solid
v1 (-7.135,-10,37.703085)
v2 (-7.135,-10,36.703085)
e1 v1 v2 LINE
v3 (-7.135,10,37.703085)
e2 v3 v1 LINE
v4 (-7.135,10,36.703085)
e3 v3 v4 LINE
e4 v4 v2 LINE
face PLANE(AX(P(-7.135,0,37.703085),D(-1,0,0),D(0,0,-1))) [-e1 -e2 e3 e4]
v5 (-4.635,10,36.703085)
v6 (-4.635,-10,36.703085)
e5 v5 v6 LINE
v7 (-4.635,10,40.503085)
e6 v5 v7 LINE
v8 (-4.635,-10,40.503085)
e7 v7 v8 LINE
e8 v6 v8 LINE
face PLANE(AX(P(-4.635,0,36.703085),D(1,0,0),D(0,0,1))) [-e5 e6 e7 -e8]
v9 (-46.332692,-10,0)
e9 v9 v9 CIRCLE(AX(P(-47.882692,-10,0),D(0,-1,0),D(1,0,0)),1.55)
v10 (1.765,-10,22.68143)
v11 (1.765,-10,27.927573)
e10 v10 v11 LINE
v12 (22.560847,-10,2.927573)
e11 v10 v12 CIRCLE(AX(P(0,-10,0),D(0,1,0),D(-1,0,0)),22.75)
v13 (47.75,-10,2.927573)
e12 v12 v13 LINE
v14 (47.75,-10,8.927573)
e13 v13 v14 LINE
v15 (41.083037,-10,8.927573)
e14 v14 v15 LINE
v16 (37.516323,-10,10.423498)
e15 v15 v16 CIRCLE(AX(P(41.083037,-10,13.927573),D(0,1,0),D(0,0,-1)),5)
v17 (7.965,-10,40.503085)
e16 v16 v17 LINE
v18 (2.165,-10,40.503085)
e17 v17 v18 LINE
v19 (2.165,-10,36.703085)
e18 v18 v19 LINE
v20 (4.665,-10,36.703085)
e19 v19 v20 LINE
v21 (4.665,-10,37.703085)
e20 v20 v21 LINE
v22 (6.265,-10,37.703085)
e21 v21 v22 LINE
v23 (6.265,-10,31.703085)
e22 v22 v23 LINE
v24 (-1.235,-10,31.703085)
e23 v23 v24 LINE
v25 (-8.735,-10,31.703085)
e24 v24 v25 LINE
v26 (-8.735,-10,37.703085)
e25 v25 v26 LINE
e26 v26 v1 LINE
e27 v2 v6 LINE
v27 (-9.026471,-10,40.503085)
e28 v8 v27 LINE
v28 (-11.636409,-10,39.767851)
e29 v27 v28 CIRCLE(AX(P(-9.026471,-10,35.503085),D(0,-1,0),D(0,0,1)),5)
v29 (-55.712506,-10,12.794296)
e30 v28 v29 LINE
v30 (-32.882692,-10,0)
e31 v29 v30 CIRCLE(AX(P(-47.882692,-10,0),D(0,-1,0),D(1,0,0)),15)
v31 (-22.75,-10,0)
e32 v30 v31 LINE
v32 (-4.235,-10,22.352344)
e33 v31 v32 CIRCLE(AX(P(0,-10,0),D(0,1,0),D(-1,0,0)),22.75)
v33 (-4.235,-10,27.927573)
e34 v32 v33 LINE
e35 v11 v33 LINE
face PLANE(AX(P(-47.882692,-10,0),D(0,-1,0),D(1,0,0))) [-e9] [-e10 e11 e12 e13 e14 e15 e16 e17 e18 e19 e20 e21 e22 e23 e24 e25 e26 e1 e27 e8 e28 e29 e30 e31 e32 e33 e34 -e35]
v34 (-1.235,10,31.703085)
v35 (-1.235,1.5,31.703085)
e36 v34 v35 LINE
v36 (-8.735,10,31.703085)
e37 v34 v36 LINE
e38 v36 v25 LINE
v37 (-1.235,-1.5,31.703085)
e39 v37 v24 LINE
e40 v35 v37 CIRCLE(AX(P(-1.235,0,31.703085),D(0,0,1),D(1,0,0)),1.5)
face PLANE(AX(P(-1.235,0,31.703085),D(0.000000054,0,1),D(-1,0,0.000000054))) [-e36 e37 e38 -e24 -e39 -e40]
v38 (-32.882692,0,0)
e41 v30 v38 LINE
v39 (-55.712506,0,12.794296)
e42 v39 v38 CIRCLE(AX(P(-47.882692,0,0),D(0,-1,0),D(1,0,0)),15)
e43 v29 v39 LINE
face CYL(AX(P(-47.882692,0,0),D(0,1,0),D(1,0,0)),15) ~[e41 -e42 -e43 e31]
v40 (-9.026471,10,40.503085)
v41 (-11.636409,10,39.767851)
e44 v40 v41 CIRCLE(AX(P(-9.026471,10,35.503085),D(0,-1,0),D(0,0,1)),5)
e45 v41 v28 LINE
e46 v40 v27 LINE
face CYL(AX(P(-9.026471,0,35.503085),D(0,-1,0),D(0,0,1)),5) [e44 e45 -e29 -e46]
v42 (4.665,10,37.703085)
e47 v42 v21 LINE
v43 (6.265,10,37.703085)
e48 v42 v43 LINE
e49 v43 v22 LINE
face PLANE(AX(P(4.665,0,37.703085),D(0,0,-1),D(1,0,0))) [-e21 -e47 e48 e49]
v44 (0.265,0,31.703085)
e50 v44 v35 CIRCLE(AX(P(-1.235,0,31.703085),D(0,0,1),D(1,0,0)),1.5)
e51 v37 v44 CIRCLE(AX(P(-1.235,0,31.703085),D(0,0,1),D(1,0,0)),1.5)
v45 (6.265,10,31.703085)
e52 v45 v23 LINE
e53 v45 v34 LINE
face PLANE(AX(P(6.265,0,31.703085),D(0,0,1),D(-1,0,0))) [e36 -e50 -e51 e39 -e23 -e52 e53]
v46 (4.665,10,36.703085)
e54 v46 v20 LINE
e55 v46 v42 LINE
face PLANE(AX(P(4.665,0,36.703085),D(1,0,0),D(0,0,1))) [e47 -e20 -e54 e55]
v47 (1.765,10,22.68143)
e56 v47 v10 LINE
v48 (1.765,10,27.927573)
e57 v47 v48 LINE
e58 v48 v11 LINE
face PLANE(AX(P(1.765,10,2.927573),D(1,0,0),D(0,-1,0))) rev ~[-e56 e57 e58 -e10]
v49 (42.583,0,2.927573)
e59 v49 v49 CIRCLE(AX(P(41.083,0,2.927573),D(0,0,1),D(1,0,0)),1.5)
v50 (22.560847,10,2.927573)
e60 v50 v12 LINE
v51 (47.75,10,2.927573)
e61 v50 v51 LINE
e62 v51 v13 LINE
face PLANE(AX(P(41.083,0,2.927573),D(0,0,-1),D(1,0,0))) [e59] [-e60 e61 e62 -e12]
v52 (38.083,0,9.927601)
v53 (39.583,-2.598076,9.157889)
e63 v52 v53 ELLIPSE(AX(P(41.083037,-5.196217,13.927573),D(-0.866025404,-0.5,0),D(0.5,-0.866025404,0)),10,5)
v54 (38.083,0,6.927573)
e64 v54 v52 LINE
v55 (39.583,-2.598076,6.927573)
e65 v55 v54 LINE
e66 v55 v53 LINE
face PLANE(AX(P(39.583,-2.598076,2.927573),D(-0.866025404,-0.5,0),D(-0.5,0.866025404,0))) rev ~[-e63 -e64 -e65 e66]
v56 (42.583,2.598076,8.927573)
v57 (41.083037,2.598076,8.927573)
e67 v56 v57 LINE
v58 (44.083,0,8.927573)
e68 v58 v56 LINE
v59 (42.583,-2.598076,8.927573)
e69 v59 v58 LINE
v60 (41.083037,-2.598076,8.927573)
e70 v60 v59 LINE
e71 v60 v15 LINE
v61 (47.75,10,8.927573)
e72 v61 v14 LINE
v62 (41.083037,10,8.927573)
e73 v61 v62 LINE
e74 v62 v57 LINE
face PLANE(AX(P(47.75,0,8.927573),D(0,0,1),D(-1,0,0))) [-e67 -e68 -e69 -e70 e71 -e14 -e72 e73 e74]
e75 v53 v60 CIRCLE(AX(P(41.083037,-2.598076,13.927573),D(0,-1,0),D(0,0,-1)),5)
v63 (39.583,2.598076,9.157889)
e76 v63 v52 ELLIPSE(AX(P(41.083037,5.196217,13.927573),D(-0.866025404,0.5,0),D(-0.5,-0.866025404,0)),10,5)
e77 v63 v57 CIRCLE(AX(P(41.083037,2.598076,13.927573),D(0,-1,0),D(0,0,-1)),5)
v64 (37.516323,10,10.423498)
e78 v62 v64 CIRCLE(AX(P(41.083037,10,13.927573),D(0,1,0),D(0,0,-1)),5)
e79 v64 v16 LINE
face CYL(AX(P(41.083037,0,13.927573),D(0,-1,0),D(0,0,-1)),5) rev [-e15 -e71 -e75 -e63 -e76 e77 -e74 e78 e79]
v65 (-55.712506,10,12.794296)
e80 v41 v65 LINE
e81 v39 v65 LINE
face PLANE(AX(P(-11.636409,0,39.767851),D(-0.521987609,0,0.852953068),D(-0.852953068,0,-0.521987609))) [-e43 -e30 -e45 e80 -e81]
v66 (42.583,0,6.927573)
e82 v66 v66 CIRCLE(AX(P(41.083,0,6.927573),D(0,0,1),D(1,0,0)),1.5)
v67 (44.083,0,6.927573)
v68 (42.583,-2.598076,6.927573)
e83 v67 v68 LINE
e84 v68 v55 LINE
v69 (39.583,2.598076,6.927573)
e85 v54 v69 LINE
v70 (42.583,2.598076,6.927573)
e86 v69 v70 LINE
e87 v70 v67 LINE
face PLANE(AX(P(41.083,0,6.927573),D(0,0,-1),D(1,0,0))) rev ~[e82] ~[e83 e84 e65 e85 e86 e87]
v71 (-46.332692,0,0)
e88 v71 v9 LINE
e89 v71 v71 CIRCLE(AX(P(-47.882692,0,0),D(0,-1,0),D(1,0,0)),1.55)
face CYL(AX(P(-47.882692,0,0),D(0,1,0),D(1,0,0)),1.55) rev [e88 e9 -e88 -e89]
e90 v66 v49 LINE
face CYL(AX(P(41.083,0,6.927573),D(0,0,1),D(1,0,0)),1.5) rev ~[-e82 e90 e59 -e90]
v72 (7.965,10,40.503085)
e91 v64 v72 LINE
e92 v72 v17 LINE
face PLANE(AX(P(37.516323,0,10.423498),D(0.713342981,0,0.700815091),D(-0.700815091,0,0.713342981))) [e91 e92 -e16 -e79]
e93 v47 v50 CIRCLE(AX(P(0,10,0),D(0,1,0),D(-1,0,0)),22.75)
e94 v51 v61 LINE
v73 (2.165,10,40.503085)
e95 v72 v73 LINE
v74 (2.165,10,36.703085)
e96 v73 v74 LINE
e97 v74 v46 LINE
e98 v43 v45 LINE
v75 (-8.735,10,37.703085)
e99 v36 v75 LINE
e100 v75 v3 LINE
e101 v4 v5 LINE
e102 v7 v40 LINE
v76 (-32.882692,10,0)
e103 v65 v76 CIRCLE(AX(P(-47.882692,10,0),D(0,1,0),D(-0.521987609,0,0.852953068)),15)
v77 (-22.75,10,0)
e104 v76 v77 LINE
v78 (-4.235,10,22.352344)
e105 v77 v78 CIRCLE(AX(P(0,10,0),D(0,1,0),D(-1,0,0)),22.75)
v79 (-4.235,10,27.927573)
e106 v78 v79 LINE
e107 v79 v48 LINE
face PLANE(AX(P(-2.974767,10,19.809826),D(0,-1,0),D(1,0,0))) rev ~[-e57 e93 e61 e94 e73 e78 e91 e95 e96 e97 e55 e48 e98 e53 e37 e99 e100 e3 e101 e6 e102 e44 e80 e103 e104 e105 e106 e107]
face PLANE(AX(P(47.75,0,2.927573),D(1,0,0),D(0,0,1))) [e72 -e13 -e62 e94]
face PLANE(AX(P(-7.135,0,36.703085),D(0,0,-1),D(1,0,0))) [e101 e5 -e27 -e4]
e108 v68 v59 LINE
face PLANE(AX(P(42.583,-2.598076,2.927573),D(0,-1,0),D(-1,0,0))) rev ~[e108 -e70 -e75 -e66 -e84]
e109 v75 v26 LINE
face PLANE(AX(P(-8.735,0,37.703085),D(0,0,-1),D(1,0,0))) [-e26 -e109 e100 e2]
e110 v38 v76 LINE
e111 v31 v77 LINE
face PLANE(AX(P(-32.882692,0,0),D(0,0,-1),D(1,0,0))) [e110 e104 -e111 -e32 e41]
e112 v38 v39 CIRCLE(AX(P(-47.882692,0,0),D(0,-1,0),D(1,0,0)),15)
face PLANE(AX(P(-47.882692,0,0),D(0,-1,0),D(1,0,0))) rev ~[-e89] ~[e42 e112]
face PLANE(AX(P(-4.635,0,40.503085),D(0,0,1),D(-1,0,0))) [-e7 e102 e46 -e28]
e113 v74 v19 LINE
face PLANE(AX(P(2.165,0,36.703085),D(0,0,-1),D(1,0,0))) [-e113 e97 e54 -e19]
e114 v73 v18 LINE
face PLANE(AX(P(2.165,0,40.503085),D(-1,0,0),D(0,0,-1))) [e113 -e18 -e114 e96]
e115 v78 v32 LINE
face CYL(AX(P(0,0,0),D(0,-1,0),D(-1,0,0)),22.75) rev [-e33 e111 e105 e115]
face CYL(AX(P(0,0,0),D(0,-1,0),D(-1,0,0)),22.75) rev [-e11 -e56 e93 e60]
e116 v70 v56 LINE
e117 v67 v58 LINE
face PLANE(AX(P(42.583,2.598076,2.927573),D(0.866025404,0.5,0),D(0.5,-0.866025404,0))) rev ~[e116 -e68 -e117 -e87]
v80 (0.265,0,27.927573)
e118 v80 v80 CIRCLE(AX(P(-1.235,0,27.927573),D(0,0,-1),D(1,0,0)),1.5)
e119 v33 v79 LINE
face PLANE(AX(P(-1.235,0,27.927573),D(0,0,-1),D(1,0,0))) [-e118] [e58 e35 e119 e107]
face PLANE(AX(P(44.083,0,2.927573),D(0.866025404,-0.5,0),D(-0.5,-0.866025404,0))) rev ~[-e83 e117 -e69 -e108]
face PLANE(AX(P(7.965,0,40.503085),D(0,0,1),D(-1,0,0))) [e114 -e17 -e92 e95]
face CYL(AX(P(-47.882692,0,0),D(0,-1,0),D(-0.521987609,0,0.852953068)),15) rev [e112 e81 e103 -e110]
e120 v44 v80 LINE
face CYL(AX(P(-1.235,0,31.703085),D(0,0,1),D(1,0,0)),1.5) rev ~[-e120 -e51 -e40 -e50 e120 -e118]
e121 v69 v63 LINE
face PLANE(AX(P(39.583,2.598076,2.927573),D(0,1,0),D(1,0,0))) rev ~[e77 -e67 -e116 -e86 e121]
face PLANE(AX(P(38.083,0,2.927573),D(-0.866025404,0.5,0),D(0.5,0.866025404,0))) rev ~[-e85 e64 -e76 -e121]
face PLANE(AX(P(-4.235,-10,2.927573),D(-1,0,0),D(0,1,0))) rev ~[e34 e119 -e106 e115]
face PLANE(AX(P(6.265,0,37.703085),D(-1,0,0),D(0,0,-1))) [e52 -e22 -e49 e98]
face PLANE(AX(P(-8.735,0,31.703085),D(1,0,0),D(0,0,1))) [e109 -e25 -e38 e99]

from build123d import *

# Parameters (mm, degrees)
F1_DEPTH  = 10
F0_R      = 1.55
F2_DEPTH  = 10
F4_DEPTH  = 50
F6_DEPTH  = 4
F7_R      = 1.5
F8_DEPTH  = 5
F9_R      = 1.5
F10_DEPTH = 25
F11_R     = 1.5
F12_DEPTH = 25


# Not quite as in the source:
# - ends of sketch curves that miss each other by under 0.0002 mm in the source are joined


with BuildPart() as f1:
    # F0 (on Front) → F1 (new body, symmetric)
    with BuildSketch(Plane.XZ):
        with BuildLine():
            ThreePointArc((-22.75, 0), (-1.4668388401, 22.702662483), (22.560846929, 2.9275733717))
            Line((22.560846929, 2.9275733717), (25.5830376256, 2.9275733717))
            Line((25.5830376256, 2.9275733717), (47.75, 2.9275733717))
            Line((47.75, 2.9275733717), (47.75, 8.9275733717))
            Line((47.75, 8.9275733717), (41.0830374761, 8.9275733717))
            ThreePointArc((41.0830374761, 8.9275733717), (39.1491782862, 9.316696163), (37.5163225707, 10.4234979182))
            Line((37.5163225707, 10.4234979182), (7.964999938, 40.503085047))
            Line((7.964999938, 40.503085047), (2.164999938, 40.503085047))
            Line((2.164999938, 40.503085047), (2.164999938, 36.703085047))
            Line((2.164999938, 36.703085047), (4.664999938, 36.703085047))
            Line((4.664999938, 36.703085047), (4.664999938, 37.703085047))
            Line((4.664999938, 37.703085047), (6.264999938, 37.703085047))
            Line((6.264999938, 37.703085047), (6.264999938, 31.703085047))
            Line((6.264999938, 31.703085047), (-1.235000062, 31.703085047))
            Line((-1.235000062, 31.703085047), (-8.735000062, 31.7030854494))
            Line((-8.735000062, 31.7030854494), (-8.735000062, 37.7030854494))
            Line((-8.735000062, 37.7030854494), (-7.135000062, 37.7030854494))
            Line((-7.135000062, 37.7030854494), (-7.135000062, 36.7030854494))
            Line((-7.135000062, 36.7030854494), (-4.635000062, 36.7030854494))
            Line((-4.635000062, 36.7030854494), (-4.635000062, 40.5030854494))
            Line((-4.635000062, 40.5030854494), (-9.0264711097, 40.5030854494))
            ThreePointArc((-9.0264711097, 40.5030854494), (-10.3822316524, 40.3157680019), (-11.6364091533, 39.7678507898))
            Line((-11.6364091533, 39.7678507898), (-55.7125058122, 12.7942960211))
            ThreePointArc((-55.7125058122, 12.7942960211), (-40.5494526959, 13.0852438258), (-32.8826916814, 0))
            Line((-32.8826916814, 0), (-25.75, 0))
            Line((-25.75, 0), (-22.75, 0))
        make_face()
    extrude(amount=F1_DEPTH, both=True)

    # F0 (on Front) → F2 (join)
    with BuildSketch(Plane.XZ):
        with BuildLine():
            ThreePointArc((-55.7125058122, 12.7942960211), (-55.2159306669, -13.0852438258), (-32.8826916814, 0))
            ThreePointArc((-32.8826916814, 0), (-40.5494526959, 13.0852438258), (-55.7125058122, 12.7942960211))
        make_face()
        with Locations((-47.8826916814, 0)):
            Circle(F0_R, mode=Mode.SUBTRACT)
    extrude(amount=F2_DEPTH)

    # F3 (on face) → F4 (cut)
    with BuildSketch(Plane(origin=(0, 0, 2.9275733717), x_dir=(1, 0, 0), z_dir=(0, 0, -1))):
        Polygon((42.583, -2.5980762114), (44.083, 0), (42.583, 2.5980762114), (39.583, 2.5980762114), (38.083, 0), (39.583, -2.5980762114), align=None)
    extrude(amount=-F4_DEPTH, mode=Mode.SUBTRACT)

    # F5 (on face) → F6 (join)
    with BuildSketch(Plane(origin=(0, 0, 2.9275733717), x_dir=(1, 0, 0), z_dir=(0, 0, -1))):
        Polygon((42.583, 2.5980762114), (39.583, 2.5980762114), (38.083, 0), (39.583, -2.5980762114), (42.583, -2.5980762114), (44.083, 0), align=None)
    extrude(amount=-F6_DEPTH)

    # F7 (on face) → F8 (cut)
    with BuildSketch(Plane.XY.offset(6.9275733717)):
        with Locations((41.083, 0)):
            Circle(F7_R)
    extrude(amount=-F8_DEPTH, mode=Mode.SUBTRACT)

    # F9 (on face) → F10 (cut)
    with BuildSketch(Plane(origin=(0, 0, 2.9275733717), x_dir=(1, 0, 0), z_dir=(0, 0, -1))):
        Polygon((-4.235000062, 10), (-4.235000062, -10), (-1.235000062, -10), (1.764999938, -10), (1.764999938, 10), align=None)
        with Locations((-1.235000062, 0)):
            Circle(F9_R, mode=Mode.SUBTRACT)
    extrude(amount=-F10_DEPTH, mode=Mode.SUBTRACT)

    # F11 (on face) → F12 (cut)
    with BuildSketch(Plane.XY.offset(31.703085047)):
        with Locations((-1.235000062, 0)):
            Circle(F11_R)
    extrude(amount=-F12_DEPTH, mode=Mode.SUBTRACT)


solid = f1.part
